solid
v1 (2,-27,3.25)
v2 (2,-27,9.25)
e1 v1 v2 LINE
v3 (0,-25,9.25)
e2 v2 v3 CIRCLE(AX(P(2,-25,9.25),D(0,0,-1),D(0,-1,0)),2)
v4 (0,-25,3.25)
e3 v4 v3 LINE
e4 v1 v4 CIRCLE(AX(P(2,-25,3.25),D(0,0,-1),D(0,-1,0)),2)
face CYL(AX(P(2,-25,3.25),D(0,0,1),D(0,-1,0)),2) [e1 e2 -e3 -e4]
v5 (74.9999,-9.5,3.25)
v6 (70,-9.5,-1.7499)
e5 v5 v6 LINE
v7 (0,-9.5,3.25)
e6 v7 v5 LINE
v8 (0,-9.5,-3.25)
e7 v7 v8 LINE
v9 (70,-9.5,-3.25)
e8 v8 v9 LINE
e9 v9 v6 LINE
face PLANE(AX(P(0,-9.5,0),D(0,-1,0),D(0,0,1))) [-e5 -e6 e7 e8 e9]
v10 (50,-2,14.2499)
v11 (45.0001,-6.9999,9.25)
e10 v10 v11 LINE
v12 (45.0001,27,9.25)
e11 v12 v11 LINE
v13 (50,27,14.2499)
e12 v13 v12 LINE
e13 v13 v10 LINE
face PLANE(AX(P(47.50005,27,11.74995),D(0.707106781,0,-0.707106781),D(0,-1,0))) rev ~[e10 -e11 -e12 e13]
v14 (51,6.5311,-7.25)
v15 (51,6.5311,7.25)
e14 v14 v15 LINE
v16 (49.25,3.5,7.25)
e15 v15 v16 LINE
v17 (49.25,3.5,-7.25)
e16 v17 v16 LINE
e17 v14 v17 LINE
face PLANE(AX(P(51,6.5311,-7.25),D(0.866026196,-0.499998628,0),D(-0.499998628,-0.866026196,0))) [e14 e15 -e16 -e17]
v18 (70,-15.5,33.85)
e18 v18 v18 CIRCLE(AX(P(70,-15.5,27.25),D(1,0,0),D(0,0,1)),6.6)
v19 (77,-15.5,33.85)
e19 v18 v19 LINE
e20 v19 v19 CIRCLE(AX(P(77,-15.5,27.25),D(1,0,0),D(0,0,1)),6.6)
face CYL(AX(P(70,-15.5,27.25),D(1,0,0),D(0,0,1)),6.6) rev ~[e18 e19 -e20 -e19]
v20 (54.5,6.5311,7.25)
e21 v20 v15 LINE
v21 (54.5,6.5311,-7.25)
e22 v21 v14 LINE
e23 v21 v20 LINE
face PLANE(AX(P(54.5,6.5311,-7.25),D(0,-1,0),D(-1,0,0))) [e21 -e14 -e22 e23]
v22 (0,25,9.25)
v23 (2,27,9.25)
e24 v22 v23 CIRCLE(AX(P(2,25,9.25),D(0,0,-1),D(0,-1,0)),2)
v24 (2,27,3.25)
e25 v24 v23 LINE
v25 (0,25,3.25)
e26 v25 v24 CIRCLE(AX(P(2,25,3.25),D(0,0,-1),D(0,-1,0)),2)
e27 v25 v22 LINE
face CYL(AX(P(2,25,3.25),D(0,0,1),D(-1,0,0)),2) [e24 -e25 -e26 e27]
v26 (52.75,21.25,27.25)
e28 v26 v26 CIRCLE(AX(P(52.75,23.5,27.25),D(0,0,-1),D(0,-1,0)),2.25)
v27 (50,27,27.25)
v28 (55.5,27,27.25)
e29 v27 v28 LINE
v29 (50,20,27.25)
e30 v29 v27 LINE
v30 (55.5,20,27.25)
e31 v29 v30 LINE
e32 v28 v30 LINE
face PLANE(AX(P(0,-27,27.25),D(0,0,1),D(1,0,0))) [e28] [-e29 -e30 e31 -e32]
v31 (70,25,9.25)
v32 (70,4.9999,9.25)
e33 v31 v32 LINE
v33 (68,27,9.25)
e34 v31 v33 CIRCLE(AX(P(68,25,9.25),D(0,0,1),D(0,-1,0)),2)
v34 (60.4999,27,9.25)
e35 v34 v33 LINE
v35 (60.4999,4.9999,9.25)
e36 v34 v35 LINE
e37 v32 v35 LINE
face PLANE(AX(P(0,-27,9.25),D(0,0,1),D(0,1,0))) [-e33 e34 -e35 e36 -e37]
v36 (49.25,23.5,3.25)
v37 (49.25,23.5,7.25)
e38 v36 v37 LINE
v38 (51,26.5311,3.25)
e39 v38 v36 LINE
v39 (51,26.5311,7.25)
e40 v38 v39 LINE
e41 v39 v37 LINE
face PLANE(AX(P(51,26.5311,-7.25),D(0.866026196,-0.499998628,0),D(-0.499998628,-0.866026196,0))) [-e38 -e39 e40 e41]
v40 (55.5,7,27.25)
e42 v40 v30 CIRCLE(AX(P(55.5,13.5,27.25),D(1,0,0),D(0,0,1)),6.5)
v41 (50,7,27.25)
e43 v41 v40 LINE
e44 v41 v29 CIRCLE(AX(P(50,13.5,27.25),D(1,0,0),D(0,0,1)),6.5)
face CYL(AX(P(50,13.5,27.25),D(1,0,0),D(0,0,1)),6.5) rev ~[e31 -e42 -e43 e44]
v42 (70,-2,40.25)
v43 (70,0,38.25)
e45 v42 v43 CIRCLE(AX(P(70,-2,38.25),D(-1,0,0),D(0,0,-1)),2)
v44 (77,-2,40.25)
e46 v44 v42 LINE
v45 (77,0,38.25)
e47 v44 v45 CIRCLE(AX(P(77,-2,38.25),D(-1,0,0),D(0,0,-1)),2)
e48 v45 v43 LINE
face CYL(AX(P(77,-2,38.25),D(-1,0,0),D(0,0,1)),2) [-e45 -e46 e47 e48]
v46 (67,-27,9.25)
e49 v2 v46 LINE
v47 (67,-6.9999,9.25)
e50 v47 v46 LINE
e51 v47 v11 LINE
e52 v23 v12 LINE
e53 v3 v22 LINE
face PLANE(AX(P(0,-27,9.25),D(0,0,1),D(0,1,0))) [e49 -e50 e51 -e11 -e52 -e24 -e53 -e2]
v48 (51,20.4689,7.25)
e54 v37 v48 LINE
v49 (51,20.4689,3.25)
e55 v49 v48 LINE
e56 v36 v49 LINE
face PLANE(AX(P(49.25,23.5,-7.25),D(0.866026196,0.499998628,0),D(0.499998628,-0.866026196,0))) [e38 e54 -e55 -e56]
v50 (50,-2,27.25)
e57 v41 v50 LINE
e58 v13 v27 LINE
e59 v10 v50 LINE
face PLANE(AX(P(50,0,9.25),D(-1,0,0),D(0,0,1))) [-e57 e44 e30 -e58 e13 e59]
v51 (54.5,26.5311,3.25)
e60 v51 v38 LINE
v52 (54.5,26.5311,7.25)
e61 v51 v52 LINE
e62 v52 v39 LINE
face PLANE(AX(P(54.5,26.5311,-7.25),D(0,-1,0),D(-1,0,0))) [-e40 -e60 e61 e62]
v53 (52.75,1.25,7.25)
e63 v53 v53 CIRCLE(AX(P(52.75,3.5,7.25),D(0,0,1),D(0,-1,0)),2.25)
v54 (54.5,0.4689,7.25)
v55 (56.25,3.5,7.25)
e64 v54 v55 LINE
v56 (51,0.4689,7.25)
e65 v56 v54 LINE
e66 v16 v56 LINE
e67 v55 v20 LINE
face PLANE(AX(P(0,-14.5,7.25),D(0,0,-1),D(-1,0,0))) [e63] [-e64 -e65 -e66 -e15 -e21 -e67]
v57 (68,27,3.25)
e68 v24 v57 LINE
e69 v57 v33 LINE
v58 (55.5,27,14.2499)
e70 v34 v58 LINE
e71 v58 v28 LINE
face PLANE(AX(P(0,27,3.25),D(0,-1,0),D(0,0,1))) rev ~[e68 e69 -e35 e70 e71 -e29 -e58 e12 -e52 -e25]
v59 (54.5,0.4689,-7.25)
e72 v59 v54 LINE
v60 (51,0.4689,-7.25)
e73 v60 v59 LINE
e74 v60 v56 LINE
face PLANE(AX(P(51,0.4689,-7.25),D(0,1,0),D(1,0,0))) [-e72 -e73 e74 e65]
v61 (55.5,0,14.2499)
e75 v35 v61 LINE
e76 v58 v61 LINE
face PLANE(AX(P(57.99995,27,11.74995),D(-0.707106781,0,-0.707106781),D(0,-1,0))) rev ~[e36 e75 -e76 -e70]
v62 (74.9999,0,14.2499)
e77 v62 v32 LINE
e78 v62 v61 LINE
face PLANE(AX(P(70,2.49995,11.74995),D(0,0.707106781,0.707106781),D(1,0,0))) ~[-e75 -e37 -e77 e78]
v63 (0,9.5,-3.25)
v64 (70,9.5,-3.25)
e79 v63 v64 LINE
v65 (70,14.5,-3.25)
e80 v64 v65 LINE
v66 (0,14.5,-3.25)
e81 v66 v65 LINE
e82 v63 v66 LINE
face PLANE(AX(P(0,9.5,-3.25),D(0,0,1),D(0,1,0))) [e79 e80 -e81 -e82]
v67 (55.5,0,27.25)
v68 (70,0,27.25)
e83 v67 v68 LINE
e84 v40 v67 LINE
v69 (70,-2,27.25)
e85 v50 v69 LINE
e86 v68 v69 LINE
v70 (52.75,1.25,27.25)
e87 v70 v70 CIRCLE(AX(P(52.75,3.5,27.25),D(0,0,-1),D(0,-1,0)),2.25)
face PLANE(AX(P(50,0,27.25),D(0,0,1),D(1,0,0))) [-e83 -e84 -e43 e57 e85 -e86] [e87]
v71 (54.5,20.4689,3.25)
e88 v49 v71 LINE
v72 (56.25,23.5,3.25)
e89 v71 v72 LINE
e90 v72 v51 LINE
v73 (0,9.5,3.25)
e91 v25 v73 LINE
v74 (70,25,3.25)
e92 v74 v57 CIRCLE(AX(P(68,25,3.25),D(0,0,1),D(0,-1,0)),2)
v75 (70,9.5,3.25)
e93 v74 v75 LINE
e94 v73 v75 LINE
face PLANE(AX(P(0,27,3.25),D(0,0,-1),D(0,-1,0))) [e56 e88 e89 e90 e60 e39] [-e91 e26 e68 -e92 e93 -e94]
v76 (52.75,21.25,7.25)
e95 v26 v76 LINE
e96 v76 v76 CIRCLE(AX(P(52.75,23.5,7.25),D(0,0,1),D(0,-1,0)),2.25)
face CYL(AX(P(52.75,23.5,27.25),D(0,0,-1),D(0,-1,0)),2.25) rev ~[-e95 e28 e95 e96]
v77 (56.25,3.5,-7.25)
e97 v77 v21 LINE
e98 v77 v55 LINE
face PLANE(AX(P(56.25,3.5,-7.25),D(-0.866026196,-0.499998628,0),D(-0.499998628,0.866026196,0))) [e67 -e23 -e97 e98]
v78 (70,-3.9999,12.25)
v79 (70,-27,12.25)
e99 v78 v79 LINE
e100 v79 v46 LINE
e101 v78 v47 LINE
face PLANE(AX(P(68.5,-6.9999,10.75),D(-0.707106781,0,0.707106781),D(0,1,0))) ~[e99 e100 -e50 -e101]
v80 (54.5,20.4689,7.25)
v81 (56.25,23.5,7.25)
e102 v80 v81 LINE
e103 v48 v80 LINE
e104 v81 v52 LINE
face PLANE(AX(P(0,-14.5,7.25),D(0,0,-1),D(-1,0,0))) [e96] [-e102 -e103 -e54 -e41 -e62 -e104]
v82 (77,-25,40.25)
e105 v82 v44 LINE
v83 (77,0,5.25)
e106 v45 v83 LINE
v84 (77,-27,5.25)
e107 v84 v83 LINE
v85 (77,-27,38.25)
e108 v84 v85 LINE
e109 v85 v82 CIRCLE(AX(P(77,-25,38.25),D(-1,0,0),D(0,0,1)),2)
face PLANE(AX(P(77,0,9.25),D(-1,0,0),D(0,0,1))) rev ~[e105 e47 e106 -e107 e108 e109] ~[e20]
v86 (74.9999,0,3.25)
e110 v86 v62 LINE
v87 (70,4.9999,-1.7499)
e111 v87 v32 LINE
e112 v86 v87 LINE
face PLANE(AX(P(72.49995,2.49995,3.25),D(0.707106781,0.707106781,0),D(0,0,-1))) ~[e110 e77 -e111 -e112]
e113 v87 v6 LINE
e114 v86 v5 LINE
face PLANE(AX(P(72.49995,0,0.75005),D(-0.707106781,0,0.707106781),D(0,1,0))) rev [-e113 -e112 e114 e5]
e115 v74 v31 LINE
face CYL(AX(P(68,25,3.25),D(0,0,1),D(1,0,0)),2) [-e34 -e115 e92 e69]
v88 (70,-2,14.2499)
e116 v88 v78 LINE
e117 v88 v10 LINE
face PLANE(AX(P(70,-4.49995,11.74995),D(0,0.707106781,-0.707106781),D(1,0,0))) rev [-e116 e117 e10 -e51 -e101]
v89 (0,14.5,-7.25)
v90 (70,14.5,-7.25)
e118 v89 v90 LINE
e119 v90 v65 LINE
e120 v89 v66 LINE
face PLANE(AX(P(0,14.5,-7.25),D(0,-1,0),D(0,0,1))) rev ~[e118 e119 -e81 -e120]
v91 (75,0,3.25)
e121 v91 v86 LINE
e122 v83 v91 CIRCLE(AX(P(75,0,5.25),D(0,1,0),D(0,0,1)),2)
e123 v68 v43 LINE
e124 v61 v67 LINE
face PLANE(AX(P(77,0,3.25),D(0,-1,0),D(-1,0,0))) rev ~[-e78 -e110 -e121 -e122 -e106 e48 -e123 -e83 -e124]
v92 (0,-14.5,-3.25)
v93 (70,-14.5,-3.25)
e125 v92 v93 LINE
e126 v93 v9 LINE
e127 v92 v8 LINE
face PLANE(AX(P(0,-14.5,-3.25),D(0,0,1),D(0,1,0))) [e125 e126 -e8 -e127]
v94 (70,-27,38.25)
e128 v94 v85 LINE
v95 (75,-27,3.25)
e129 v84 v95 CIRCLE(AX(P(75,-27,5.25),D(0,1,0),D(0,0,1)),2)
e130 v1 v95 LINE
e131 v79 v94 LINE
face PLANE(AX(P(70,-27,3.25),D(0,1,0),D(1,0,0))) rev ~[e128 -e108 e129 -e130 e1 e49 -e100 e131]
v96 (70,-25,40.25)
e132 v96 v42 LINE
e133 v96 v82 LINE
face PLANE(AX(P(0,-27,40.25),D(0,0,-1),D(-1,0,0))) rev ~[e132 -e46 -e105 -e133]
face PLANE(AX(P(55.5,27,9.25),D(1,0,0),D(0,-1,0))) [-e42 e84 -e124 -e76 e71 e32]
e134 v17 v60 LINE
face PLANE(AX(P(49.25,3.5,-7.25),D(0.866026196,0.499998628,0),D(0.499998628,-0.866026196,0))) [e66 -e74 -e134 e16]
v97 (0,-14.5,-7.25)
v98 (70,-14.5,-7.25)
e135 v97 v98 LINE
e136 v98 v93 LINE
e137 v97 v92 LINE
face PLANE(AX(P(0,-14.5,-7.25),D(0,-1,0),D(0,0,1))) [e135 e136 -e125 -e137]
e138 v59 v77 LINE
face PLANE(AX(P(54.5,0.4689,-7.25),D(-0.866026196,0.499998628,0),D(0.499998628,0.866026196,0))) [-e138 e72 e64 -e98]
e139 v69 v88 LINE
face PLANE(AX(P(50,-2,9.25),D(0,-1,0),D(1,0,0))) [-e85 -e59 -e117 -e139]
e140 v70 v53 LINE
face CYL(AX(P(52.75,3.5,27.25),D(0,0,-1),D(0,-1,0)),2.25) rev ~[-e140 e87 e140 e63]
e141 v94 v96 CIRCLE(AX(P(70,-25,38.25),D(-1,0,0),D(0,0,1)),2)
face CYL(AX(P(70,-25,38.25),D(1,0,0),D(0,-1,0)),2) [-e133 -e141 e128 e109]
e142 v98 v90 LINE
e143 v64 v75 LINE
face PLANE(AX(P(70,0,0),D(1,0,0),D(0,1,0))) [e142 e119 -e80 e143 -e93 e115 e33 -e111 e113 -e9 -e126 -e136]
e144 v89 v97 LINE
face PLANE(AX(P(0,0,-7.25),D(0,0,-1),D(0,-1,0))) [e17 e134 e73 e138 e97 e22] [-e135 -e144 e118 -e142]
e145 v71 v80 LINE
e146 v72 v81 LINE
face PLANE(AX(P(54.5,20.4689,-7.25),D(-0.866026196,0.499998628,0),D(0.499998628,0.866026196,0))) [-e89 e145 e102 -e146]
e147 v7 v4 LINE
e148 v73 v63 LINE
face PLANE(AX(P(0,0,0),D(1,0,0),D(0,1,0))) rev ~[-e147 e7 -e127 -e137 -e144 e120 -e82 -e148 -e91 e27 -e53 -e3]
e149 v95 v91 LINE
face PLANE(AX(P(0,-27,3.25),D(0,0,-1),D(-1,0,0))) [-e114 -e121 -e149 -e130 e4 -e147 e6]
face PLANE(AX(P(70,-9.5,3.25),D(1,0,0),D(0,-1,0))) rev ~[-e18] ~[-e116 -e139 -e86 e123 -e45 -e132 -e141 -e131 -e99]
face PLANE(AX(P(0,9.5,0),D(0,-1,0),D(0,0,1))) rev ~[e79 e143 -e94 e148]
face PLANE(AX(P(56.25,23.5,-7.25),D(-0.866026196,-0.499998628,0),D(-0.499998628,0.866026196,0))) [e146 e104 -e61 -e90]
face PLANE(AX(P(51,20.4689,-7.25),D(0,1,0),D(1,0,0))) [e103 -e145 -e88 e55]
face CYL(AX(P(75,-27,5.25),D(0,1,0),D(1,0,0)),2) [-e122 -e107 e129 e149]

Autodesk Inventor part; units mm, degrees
ref_plane "YZ Plane" through (0, 0, 0) normal (1, 0, 0) x (0, 1, 0)
ref_plane "XZ Plane" through (0, 0, 0) normal (0, 1, 0) x (-1, 0, 0)
ref_plane "XY Plane" through (0, 0, 0) normal (0, 0, 1) x (1, 0, 0)
sketch "Sketch2" plane through (0, 0, 0) normal (1, 0, 0) x (0, 1, 0)
  line L0 (-19.9252, 0) -> (19.9252, 0)
  line L1 (0, -28.9507) -> (0, 28.9507)
  line L2 (14.5, -7.25) -> (-14.5, -7.25)
  line L3 (-14.5, -7.25) -> (-14.5, -3.25)
  line L4 (-9.5, -3.25) -> (-9.5, 3.25)
  line L5 (-27, 3.25) -> (-27, 9.25)
  line L6 (-27, 9.25) -> (27, 9.25)
  line L7 (14.5, -7.25) -> (14.5, -3.25)
  line L8 (9.5, -3.25) -> (9.5, 3.25)
  line L9 (27, 3.25) -> (27, 9.25)
  line L10 (-14.5, -3.25) -> (-9.5, -3.25)
  line L11 (9.5, -3.25) -> (14.5, -3.25)
  line L12 (27, 3.25) -> (9.5, 3.25)
  line L13 (-9.5, 3.25) -> (-27, 3.25)
  point P0 (0, 0)
  point P1 (0, 0)
  point P2 (9.5, 0)
  dimension "d4" = 14.5
  dimension "d8" = 27
  dimension "d9" = 9.5
  dimension "d10" = 4
  dimension "d11" = 6.5
  dimension "d12" = 6
extrude "Extrusion2" add sketch "Sketch2" along normal blind 70
sketch "Sketch3" plane through (0, -27, 9.25) normal (0, 0, 1) x (1, 0, 0)
  line L0 (0, 0) -> (70, 0) projected
  line L1 (0, 54) -> (70, 54) projected
  line L2 (50, 27) -> (50, 54)
  line L3 (50, 54) -> (55.5, 54)
  line L4 (55.5, 54) -> (55.5, 27)
  line L5 (70, 54) -> (70, 0) projected
  line L6 (50, 27) -> (55.5, 27)
  point P0 (0, 27)
  dimension "d15" = 20
  dimension "d16" = 5.5
  dimension "d43" = 27
  dimension "d44" = 27
extrude "Extrusion3" add sketch "Sketch3" along normal blind 18
sketch "Sketch7" plane through (0, -27, 3.25) normal (0, 0, -1) x (-1, 0, 0)
  line L0 (0, 0) -> (70, 0)
  line L1 (-70, 0) -> (-77, 0)
  line L2 (-77, 0) -> (-77, 27)
  line L3 (-77, 27) -> (-70, 27)
  line L4 (-70, 27) -> (-70, 0)
  line L5 (70, 54) -> (70, 0)
  line L6 (-70, 0) -> (-70, 17.5) projected
  point P0 (0, 27)
  dimension "d45" = 7
  dimension "d50" = 0
extrude "Extrusion6" add sketch "Sketch7" against normal blind 37
sketch "Sketch9" plane through (50, 0, 9.25) normal (-1, 0, 0) x (0, 0, 1)
  line L0 (18, 27) -> (18, 0) projected
  line L1 (0, -27) -> (31, -27) projected
  point P0 (-9.25, 0)
  point P1 (18, 13.5)
hole "Hole2" at (50, 13.5, 27.25) direction (1, 0, 0) diameter 13 end through all
sketch "Sketch10" plane through (0, -27, 27.25) normal (0, 0, 1) x (1, 0, 0)
  line L0 (55.5, 54) -> (50, 54) projected
  line L1 (50, 54) -> (50, 47) projected
  line L2 (55.5, 40.5) -> (50, 40.5)
  line L3 (50, 34) -> (50, 47)
  line L4 (70, 54) -> (70, 27) projected
  line L5 (55.5, 54) -> (70, 54) projected
  point P0 (0, 27)
  point P1 (52.75, 50.5)
  point P2 (52.75, 30.5)
  dimension "d99" = 20
  dimension "d100" = 13.5
  dimension "d101" = 2.75
  dimension "d102" = 3.5
  dimension "d103" = 2.75
  dimension "d104" = 23.5
hole "Hole3" at (52.75, 23.5, 27.25) at (52.75, 3.5, 27.25) direction (0, 0, -1) diameter 4.5 end through all
sketch "Sketch11" plane through (0, -14.5, -7.25) normal (0, 0, -1) x (-1, 0, 0)
  circle A0 centre (-52.75, 18) radius 2.25 projected
  line L0 (-56.25, 18) -> (-54.5, 21.0311)
  line L1 (-54.5, 21.0311) -> (-51, 21.0311)
  line L2 (-51, 21.0311) -> (-49.25, 18)
  line L3 (-49.25, 18) -> (-51, 14.9689)
  line L4 (-51, 14.9689) -> (-54.5, 14.9689)
  line L5 (-54.5, 14.9689) -> (-56.25, 18)
  circle A1 centre (-52.75, 38) radius 2.25 projected
  line L6 (-56.25, 38) -> (-54.5, 41.0311)
  line L7 (-54.5, 41.0311) -> (-51, 41.0311)
  line L8 (-51, 41.0311) -> (-49.25, 38)
  line L9 (-49.25, 38) -> (-51, 34.9689)
  line L10 (-51, 34.9689) -> (-54.5, 34.9689)
  line L11 (-54.5, 34.9689) -> (-56.25, 38)
  point P0 (0, 14.5)
  dimension "d71" = 7
  dimension "d74" = 7
extrude "Extrusion7" cut sketch "Sketch11" against normal blind 14.5
fillet "Fillet1" radius 2 6 edges at (73.5, 0, 40.25) (73.5, -27, 40.25) (70, 27, 6.25) (0, 27, 6.25) (0, -27, 6.25) (77, -13.5, 3.25)
sketch "Sketch13" plane through (50, 0, 9.25) normal (0, -1, 0) x (1, 0, 0)
  line L0 (27, -4) -> (27, 29) projected
  line L1 (0, 18) -> (27, 18)
  line L2 (27, 18) -> (27, 0)
  line L3 (27, 0) -> (0, 0)
  line L4 (0, 0) -> (0, 18)
  point P0 (-50, -9.25)
  point P1 (20, 0)
  dimension "d95" = 0
extrude "Extrusion9" add sketch "Sketch13" along normal blind 2
chamfer "Chamfer3" distance 5 angle 45 6 edges at (50, 12.5, 9.25) (55.5, 13.5, 9.25) (70, -4.75, 3.25) (70, 0, 6.25) (62.75, 0, 9.25) (60, -2, 9.25)
sketch "Sketch14" plane through (70, -25, 40.25) normal (-1, 0, 0) x (0, 0, 1)
  circle A0 centre (-13, 9.5) radius 9.5
  line L0 (-31, -2) -> (-2, -2) projected
  line L1 (0, 23) -> (0, 0) projected
  point P0 (-40.25, 25)
  point P1 (-26, -2)
  dimension "d85" = 19
  dimension "d86" = 11.5
  dimension "d94" = 13
hole "Hole4" at (70, -15.5, 27.25) direction (1, 0, 0) diameter 13.2 end through all
chamfer "Chamfer4" distance 3 angle 45 1 edges at (70, -17, 9.25)
properties part number "CarroXY - Hotend"
